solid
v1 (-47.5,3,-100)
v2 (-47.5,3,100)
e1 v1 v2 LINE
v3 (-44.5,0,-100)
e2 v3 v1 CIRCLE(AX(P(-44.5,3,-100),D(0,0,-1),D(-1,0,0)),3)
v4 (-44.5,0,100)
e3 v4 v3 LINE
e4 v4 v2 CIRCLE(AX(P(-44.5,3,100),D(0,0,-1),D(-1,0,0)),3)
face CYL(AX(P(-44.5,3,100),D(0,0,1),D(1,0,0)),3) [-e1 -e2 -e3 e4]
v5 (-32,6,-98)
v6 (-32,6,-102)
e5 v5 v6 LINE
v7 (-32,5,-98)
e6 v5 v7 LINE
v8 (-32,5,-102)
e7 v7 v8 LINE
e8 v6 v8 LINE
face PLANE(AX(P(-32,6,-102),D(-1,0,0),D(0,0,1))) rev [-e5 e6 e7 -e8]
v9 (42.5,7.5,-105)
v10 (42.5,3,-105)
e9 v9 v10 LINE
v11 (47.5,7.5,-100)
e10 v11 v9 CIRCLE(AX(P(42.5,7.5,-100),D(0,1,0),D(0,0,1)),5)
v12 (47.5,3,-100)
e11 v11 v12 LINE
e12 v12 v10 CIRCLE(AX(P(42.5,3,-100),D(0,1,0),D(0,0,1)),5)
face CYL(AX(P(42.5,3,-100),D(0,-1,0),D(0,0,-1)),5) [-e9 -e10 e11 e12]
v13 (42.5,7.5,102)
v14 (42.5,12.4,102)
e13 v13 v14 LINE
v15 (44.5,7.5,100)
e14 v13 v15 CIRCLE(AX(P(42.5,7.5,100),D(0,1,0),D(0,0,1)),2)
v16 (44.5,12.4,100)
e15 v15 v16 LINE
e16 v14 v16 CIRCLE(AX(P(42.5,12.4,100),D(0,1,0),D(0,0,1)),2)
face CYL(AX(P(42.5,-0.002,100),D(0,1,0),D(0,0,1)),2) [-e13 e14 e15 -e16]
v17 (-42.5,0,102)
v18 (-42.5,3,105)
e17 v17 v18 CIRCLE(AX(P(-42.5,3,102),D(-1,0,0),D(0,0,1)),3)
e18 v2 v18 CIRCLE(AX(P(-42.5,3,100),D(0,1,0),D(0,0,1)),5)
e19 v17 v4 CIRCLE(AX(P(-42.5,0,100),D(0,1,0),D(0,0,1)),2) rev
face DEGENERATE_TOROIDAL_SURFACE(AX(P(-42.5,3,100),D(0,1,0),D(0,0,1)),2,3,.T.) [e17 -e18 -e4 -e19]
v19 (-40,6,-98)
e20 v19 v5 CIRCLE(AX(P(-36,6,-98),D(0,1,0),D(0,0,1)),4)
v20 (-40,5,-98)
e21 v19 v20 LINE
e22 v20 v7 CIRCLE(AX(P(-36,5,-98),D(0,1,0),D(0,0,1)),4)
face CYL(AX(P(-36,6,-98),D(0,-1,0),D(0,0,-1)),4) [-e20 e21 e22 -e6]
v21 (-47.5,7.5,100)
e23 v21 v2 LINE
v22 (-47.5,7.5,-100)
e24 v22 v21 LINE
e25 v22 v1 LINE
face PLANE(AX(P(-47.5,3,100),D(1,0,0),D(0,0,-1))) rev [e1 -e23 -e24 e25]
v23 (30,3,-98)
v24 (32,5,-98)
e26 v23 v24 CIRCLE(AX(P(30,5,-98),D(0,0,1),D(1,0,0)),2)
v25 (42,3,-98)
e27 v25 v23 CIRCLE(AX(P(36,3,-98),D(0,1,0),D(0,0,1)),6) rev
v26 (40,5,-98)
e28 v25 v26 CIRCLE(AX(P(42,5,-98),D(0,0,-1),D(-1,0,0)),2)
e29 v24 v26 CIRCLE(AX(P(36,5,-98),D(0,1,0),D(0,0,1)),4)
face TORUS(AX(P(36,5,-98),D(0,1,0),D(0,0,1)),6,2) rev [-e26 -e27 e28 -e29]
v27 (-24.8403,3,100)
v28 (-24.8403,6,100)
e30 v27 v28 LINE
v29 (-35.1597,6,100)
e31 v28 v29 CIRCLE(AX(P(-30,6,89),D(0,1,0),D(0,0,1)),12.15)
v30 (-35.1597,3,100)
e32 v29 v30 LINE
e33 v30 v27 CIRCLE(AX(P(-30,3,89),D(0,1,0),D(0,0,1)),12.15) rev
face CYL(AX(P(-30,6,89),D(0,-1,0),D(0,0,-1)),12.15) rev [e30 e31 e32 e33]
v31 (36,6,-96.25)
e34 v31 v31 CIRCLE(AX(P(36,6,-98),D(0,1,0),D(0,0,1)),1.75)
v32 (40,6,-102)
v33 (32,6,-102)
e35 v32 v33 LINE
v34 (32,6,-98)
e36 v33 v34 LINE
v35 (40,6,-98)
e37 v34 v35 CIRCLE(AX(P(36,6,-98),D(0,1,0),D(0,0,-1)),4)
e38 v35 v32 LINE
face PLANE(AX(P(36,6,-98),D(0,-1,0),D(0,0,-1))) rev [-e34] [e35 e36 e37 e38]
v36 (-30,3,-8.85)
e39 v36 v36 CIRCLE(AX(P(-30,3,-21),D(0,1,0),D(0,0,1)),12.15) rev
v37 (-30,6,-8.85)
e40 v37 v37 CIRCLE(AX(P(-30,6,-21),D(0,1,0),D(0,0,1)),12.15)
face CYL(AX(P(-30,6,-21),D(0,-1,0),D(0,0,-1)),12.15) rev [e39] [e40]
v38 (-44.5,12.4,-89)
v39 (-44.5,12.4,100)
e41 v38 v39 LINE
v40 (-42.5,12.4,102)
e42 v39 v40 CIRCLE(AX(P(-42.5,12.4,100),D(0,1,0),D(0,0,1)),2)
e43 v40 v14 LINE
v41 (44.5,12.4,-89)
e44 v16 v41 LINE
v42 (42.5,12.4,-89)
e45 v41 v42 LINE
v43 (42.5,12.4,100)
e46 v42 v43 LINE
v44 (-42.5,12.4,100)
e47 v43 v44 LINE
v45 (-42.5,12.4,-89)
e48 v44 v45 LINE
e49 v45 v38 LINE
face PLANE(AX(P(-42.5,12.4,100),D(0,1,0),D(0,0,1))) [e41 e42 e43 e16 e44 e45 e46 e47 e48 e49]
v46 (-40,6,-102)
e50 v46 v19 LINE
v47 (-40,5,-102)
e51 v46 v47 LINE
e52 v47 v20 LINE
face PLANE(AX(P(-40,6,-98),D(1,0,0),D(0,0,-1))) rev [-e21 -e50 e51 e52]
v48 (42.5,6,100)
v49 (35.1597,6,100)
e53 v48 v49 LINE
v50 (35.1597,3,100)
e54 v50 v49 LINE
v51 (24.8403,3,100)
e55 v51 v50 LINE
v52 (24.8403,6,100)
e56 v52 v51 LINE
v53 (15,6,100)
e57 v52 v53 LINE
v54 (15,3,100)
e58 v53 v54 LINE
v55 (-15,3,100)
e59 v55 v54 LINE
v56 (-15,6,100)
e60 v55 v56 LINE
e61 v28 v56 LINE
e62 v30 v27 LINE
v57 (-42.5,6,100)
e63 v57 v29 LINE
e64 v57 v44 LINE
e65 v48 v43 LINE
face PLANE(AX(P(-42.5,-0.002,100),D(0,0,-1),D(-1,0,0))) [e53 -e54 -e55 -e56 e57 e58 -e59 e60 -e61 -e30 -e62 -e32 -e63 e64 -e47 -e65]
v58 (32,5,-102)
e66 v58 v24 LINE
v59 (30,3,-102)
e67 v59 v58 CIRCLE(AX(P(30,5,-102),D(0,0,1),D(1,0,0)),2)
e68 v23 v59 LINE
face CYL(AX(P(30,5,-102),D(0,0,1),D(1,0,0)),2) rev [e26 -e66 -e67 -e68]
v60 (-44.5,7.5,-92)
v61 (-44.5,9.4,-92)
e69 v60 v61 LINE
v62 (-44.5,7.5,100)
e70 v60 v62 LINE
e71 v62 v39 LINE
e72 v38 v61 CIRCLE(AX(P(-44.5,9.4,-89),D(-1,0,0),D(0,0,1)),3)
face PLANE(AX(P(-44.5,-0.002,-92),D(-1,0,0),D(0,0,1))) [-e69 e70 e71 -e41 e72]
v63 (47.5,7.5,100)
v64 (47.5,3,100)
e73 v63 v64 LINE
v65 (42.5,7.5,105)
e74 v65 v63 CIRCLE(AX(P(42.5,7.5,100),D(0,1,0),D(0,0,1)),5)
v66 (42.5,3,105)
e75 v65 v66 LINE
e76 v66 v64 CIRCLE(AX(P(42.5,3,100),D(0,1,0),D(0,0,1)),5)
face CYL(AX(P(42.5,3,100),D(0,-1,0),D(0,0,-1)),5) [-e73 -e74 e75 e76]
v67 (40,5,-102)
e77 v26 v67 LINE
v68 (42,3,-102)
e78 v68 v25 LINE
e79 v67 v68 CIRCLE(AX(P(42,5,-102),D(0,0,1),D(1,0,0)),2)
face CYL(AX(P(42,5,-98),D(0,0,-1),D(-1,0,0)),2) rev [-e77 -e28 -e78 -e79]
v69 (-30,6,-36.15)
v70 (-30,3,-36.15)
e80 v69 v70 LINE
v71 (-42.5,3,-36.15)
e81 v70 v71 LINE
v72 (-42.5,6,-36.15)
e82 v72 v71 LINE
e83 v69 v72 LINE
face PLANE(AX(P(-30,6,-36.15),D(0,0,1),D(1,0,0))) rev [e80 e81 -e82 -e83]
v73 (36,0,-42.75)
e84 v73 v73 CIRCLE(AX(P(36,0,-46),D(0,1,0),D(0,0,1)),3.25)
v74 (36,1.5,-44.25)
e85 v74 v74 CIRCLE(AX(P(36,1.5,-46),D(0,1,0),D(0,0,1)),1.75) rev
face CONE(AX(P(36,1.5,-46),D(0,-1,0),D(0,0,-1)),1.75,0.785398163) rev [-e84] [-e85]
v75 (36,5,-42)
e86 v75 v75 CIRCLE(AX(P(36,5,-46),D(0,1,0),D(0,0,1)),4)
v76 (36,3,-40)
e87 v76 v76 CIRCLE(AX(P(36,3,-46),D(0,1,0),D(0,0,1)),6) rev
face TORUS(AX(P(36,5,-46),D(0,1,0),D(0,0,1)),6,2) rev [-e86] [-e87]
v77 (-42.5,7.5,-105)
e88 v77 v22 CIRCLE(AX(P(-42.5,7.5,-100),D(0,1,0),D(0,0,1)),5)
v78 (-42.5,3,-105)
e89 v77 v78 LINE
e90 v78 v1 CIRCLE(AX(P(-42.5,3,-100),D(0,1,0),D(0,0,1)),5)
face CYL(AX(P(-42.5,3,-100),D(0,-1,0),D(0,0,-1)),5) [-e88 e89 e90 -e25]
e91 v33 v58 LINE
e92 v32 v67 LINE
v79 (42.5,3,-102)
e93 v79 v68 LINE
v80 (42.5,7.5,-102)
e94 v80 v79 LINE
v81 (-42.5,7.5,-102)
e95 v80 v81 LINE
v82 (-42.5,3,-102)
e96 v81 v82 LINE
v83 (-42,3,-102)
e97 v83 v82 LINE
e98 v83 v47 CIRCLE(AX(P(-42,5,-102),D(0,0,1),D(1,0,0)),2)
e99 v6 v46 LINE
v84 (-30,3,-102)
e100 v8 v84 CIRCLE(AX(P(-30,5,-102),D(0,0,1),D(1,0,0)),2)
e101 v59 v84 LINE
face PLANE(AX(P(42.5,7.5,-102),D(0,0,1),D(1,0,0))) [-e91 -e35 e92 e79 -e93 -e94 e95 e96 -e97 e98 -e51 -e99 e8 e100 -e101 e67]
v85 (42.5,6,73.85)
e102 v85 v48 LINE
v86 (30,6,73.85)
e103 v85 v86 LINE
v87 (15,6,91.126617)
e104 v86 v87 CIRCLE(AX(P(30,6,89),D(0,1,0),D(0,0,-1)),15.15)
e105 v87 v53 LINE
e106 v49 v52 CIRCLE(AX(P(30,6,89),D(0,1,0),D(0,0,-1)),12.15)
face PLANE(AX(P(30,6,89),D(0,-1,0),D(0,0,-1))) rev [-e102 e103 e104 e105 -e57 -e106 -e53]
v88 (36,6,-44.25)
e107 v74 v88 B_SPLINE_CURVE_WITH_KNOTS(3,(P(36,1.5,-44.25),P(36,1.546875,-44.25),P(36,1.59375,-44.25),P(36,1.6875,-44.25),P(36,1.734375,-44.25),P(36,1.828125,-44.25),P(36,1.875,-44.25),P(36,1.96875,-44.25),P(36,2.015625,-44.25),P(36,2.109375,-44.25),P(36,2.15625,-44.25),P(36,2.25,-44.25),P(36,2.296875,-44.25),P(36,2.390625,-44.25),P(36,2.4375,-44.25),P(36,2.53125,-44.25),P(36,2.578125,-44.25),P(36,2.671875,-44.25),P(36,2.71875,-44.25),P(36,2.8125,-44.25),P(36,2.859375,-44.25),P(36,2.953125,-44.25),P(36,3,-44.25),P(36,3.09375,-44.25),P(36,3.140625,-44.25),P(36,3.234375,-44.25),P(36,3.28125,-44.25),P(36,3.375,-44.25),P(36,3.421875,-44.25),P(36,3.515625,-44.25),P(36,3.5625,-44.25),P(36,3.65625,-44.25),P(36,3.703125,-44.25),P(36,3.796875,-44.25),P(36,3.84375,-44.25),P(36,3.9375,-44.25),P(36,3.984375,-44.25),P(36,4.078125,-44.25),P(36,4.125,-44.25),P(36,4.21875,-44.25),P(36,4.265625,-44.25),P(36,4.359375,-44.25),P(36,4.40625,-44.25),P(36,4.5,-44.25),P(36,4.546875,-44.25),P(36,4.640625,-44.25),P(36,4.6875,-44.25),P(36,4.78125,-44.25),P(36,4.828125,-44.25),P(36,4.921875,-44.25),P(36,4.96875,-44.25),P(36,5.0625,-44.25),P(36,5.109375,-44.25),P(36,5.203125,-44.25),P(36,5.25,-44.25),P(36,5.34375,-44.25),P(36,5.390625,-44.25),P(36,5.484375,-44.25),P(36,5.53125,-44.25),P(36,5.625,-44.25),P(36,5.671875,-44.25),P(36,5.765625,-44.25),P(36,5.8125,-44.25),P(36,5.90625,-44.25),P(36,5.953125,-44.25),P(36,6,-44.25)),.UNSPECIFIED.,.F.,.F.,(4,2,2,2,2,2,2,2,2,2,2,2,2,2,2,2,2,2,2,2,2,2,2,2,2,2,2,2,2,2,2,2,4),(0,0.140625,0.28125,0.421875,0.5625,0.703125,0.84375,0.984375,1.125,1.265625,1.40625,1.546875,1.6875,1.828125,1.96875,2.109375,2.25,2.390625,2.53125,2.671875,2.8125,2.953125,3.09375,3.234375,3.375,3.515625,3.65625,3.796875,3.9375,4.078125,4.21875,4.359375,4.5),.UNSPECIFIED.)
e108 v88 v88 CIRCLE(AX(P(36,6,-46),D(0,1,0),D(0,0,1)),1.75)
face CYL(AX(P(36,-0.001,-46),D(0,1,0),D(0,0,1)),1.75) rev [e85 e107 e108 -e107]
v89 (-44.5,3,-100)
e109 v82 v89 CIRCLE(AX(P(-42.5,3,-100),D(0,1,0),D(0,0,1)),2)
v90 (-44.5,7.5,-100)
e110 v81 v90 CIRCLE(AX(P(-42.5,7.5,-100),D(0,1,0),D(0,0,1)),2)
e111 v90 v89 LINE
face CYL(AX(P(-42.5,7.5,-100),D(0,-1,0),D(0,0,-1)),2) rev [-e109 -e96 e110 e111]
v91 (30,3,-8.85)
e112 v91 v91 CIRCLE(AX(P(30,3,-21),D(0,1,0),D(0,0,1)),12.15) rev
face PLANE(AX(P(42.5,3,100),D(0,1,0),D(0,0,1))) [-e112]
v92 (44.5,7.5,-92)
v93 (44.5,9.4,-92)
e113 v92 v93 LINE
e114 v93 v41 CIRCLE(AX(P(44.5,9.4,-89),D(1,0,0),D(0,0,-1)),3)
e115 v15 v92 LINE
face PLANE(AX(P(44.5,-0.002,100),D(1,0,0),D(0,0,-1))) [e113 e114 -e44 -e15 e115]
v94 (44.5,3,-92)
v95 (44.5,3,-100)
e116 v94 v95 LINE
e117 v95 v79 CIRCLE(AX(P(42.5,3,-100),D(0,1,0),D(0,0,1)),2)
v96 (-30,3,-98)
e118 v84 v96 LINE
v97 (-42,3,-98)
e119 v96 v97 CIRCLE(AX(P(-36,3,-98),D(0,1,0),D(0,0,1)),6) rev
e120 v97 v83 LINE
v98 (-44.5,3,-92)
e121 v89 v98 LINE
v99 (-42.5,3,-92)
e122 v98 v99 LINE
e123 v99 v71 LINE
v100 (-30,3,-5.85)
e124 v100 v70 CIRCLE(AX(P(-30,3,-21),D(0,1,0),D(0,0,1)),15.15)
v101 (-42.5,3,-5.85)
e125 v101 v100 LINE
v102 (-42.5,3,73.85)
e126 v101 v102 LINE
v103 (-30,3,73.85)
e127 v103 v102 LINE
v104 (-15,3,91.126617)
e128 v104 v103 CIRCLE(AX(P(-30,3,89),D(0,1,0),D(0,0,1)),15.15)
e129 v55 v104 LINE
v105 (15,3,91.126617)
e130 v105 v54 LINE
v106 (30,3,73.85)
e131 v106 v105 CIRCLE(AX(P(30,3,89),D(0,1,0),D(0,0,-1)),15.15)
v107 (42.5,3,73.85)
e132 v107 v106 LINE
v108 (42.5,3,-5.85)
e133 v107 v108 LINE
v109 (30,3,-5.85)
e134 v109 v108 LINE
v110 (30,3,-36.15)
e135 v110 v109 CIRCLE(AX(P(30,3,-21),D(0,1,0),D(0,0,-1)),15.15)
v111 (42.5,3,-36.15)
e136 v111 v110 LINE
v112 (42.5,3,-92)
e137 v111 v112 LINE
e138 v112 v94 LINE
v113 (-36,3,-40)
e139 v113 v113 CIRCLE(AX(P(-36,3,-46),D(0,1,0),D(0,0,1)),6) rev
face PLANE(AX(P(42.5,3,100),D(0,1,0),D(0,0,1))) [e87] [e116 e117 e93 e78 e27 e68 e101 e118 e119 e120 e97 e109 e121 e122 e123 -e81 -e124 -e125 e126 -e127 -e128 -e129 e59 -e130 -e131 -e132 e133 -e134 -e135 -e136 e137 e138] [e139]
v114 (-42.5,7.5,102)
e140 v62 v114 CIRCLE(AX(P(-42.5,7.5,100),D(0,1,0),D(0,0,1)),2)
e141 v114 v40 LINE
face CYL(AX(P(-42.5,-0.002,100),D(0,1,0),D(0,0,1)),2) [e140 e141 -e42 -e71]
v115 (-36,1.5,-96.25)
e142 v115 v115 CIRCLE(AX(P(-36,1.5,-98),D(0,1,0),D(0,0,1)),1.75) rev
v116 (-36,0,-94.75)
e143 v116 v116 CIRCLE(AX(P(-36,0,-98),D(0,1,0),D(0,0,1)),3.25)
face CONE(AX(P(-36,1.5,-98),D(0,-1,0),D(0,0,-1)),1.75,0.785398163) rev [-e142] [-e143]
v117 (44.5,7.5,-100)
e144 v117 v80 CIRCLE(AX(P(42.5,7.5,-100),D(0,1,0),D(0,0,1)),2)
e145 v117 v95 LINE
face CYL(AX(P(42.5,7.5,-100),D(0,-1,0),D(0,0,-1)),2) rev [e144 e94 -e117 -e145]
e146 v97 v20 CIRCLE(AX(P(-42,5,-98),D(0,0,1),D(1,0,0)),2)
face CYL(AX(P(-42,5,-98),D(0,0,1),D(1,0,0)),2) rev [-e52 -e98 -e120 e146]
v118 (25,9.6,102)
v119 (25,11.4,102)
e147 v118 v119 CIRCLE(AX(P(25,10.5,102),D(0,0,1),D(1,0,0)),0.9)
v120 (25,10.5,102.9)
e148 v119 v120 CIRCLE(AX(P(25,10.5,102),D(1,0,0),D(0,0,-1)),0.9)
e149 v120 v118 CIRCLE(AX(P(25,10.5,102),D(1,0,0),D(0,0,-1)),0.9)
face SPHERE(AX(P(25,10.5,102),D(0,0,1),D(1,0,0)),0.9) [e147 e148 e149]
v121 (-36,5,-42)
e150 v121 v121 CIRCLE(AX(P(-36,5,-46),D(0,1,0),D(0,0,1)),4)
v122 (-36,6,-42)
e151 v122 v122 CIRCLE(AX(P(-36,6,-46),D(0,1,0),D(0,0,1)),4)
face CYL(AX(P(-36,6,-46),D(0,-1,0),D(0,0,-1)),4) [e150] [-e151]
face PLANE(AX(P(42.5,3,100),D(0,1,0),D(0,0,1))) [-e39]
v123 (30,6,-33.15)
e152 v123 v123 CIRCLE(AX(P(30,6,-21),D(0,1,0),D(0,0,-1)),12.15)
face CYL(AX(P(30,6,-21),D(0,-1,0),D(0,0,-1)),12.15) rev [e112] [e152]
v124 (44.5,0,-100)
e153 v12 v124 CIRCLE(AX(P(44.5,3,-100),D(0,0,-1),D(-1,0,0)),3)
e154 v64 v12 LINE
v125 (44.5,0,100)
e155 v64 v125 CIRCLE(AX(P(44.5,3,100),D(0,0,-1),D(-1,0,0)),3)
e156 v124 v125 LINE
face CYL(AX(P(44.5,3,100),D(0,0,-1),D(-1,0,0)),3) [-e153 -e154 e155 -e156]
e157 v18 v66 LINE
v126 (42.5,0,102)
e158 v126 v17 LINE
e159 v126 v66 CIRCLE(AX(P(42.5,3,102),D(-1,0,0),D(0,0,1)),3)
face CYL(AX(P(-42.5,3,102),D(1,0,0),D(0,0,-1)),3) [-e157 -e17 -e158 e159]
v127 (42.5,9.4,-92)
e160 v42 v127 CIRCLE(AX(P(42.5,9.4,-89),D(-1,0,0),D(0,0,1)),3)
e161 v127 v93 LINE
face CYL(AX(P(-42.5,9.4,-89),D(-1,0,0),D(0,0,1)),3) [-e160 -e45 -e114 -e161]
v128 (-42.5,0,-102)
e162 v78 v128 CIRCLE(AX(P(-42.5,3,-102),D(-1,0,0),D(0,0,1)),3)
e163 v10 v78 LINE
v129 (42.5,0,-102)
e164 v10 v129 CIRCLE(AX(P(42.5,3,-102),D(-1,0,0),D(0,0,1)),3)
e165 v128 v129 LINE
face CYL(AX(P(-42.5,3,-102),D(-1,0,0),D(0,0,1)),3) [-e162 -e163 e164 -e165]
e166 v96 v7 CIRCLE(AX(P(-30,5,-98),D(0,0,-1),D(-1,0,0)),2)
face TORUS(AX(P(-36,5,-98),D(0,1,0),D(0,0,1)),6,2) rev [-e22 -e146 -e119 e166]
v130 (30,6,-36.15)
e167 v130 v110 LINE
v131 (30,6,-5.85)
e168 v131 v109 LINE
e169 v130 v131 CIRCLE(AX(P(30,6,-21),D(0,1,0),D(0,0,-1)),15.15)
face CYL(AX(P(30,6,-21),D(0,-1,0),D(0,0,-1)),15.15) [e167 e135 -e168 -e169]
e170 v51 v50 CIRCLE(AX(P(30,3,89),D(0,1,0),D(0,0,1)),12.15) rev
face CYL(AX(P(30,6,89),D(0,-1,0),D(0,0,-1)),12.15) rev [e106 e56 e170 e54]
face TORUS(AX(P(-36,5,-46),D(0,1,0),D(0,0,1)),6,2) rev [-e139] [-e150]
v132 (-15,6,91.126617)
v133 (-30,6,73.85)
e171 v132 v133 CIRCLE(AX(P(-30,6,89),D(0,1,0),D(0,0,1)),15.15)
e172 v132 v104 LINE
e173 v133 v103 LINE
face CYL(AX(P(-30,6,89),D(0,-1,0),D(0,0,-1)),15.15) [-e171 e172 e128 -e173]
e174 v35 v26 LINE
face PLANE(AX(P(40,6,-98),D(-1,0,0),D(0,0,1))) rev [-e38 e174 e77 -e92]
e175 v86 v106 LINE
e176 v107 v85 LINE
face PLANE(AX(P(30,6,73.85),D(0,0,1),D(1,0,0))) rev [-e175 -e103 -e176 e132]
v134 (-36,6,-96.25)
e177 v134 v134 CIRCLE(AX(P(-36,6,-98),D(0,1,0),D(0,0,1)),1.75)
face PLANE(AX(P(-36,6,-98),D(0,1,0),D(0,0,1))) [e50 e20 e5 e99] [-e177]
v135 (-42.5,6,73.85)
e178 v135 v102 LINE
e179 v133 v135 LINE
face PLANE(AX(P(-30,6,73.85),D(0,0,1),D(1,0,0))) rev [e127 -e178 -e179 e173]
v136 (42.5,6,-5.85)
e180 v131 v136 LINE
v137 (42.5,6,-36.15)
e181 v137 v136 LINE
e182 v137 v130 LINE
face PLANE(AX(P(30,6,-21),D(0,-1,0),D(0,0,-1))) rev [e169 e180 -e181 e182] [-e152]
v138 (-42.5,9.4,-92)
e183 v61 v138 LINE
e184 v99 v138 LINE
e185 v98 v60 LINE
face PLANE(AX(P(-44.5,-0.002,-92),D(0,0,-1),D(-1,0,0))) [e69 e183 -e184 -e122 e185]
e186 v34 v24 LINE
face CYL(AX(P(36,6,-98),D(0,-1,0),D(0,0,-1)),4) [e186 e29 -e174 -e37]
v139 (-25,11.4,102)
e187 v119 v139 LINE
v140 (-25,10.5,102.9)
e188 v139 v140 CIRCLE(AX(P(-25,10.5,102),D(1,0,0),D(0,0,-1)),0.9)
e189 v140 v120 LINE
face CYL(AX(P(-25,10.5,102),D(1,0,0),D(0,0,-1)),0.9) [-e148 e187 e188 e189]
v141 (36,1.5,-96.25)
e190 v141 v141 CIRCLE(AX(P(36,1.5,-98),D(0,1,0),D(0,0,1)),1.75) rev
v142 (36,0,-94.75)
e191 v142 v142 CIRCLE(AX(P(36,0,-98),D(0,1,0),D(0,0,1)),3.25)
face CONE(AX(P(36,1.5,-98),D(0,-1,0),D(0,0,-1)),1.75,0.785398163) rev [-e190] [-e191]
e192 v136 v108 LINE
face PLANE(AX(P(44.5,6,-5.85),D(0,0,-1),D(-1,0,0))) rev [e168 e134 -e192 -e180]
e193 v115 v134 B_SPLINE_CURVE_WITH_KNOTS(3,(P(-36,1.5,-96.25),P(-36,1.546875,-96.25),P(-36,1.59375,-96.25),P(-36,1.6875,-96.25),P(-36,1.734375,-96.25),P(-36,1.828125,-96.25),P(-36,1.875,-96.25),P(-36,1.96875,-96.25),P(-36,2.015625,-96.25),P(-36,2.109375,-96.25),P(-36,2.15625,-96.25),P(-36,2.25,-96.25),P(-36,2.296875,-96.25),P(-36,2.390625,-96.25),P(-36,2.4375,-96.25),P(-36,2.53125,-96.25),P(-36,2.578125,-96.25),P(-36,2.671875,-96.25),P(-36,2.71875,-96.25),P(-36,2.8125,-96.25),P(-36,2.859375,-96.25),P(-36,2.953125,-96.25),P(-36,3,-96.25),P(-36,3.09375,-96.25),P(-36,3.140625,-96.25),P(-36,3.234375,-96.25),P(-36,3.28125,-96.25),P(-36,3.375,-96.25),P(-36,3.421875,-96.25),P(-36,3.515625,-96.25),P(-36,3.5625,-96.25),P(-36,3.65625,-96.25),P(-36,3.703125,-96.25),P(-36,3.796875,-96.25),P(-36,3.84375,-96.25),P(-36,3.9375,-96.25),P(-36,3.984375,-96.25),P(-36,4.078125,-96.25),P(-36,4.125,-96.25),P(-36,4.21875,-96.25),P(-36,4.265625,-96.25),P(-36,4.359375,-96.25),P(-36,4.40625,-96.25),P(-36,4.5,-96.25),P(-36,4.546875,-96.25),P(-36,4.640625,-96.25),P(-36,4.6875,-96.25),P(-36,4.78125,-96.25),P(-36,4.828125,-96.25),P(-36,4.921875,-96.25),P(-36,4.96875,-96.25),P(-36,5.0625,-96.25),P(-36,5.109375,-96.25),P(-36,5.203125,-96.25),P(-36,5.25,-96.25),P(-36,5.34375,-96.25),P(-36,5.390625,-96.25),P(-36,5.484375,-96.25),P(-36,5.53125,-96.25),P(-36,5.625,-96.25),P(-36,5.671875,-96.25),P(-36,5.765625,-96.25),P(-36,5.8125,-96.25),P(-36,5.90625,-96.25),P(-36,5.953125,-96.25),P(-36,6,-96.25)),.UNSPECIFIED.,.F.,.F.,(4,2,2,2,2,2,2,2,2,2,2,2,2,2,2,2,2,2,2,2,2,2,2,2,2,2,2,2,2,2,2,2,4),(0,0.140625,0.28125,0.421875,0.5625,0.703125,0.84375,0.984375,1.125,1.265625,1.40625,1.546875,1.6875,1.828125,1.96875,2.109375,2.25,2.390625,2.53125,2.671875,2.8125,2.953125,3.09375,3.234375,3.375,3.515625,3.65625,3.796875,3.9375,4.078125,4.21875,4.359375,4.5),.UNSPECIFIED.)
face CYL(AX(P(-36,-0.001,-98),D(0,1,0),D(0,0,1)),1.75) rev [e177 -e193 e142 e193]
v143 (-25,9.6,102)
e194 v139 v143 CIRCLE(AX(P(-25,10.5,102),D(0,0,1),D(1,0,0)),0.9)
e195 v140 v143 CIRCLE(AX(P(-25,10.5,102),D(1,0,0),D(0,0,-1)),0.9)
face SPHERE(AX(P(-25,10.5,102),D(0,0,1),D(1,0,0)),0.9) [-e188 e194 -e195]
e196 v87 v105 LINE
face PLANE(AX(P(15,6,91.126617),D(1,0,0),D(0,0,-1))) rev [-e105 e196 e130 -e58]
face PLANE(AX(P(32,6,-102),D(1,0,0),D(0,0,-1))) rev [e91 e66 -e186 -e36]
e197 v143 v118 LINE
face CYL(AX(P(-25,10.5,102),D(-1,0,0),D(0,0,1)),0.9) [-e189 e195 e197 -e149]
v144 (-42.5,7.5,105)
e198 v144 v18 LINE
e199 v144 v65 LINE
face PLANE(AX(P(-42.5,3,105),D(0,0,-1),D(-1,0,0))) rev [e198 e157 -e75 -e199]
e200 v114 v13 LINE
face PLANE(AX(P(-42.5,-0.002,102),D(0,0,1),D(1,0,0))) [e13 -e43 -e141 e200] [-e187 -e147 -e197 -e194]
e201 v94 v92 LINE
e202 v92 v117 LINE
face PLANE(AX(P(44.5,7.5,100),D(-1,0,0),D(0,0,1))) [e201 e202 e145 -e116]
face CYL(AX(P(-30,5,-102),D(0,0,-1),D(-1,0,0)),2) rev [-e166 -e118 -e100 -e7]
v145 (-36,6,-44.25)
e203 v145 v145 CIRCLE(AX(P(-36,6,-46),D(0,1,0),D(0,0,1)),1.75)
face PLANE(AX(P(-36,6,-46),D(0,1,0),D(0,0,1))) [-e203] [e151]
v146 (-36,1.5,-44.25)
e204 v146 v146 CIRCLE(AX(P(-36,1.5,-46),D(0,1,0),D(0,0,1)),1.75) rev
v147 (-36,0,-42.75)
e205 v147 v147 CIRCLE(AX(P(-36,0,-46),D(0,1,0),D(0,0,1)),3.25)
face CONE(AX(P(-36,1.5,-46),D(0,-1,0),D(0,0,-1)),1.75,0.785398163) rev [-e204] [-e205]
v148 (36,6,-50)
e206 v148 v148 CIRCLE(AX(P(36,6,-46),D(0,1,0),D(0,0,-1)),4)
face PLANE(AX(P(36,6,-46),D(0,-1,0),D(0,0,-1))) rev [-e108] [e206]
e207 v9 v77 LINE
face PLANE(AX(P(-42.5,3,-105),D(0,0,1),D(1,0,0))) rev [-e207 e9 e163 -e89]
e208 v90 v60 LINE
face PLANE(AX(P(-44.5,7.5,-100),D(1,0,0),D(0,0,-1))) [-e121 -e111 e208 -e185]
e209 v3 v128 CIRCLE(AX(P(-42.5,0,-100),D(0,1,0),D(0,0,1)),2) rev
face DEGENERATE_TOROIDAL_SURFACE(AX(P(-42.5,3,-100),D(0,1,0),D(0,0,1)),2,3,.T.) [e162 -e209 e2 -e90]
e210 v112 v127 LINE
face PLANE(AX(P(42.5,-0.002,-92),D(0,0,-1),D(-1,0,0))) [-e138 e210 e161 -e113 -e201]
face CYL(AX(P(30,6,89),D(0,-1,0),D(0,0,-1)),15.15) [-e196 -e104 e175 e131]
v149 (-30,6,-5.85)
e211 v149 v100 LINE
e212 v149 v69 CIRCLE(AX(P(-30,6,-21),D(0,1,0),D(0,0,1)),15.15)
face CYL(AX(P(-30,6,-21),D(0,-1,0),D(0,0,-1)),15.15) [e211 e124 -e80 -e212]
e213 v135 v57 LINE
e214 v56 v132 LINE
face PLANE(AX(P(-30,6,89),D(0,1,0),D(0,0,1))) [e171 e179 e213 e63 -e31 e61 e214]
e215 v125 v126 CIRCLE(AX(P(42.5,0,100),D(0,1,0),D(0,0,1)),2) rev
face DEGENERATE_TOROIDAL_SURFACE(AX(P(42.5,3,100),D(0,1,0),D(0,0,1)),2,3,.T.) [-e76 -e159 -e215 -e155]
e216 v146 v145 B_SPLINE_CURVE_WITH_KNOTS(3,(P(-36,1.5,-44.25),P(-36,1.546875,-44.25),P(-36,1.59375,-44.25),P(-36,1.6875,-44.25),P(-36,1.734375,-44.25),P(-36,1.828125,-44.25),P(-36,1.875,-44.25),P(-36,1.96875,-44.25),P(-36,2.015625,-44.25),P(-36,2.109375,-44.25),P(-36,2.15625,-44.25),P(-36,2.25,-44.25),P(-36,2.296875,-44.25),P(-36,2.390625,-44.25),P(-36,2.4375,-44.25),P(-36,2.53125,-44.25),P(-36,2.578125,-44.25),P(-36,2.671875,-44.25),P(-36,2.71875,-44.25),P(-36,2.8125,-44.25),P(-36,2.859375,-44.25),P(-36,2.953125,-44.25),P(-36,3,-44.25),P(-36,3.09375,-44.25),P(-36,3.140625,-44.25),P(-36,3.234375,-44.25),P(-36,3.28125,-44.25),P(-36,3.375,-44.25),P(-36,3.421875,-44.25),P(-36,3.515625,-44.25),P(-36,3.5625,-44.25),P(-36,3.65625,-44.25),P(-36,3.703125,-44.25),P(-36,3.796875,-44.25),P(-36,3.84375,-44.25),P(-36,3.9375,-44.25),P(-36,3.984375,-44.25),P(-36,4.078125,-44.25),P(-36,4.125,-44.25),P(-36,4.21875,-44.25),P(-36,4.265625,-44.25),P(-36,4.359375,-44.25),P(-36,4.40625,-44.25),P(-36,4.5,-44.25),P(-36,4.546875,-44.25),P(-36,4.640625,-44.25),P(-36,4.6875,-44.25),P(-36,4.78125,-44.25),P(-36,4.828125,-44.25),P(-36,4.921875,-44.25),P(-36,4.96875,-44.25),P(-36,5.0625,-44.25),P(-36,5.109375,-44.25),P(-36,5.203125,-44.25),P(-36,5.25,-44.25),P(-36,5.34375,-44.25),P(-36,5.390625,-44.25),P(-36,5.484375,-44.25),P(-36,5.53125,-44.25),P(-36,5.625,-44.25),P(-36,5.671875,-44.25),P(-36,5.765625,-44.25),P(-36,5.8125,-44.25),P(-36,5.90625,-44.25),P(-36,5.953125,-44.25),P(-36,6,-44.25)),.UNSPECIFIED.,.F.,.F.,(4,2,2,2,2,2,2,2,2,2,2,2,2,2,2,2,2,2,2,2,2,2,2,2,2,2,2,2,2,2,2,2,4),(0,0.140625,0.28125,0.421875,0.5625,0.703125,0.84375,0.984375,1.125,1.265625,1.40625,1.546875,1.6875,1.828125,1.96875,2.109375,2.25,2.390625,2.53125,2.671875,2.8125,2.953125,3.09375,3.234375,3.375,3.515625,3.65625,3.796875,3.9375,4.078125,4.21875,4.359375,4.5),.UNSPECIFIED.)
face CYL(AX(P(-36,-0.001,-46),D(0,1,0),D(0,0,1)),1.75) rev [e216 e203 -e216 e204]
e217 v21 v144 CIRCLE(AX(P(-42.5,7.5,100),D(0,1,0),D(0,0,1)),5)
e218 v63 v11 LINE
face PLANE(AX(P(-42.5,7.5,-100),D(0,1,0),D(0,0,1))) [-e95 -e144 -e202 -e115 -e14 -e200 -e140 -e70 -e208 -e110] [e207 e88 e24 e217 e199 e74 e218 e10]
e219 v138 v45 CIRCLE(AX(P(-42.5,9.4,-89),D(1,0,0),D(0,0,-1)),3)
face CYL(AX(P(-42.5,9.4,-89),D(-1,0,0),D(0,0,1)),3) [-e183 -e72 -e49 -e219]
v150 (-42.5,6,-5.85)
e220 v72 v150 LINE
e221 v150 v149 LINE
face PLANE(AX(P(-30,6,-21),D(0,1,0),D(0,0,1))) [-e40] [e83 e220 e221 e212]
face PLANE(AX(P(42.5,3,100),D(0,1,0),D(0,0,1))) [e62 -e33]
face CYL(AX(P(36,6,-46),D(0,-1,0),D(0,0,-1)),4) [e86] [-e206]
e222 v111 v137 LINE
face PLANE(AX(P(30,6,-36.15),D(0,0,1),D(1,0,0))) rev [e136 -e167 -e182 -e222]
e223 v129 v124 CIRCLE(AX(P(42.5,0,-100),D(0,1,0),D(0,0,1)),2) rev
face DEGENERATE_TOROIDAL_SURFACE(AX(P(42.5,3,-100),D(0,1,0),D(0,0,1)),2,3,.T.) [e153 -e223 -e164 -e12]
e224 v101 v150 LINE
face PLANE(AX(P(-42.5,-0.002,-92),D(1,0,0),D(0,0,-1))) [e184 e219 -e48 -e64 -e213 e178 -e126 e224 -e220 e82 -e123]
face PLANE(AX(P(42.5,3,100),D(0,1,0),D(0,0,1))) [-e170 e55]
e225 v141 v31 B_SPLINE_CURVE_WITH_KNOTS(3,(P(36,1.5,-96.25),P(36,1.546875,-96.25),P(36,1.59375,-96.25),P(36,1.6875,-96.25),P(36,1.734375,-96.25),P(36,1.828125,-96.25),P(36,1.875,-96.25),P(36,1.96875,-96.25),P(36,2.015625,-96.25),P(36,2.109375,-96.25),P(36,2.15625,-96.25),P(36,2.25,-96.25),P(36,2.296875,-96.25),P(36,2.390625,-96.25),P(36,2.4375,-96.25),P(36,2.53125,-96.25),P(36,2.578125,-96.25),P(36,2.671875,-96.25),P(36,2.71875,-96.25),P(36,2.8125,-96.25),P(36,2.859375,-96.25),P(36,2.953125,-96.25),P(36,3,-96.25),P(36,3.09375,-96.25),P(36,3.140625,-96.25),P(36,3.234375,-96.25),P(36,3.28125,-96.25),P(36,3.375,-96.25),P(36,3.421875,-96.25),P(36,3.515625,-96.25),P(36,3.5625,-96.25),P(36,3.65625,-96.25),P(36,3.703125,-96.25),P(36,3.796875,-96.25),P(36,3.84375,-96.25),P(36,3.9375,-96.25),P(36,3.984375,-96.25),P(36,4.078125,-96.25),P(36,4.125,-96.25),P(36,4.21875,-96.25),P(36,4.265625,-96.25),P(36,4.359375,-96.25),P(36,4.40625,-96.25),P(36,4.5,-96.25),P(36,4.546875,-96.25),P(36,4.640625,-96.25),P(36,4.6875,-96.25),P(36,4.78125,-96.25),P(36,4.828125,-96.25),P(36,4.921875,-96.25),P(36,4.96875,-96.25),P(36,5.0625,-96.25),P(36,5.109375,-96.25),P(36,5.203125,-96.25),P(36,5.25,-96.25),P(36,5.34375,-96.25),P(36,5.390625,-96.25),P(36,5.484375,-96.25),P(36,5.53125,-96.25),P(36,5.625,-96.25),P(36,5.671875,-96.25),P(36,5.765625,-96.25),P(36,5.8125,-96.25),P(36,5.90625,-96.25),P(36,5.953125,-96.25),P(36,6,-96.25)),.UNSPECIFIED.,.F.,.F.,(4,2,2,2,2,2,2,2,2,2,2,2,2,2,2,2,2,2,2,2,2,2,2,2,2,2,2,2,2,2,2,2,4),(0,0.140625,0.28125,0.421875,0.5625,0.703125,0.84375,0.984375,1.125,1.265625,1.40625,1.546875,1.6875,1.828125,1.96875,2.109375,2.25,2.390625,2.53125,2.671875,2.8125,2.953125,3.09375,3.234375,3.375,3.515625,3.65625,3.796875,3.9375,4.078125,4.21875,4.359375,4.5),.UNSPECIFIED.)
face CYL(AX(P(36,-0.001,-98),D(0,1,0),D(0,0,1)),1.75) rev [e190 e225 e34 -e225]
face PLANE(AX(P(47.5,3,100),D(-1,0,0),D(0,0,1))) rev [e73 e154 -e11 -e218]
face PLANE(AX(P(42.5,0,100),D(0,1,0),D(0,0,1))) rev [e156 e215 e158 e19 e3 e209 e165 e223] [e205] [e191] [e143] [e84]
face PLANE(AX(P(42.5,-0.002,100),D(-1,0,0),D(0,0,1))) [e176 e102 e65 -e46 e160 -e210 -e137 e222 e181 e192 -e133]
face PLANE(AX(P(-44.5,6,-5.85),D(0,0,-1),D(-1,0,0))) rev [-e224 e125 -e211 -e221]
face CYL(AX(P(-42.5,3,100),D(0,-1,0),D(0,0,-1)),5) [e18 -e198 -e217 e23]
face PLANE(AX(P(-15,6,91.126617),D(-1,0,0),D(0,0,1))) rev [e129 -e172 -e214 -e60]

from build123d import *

# Parameters (mm, degrees)
BOSS_EXTRUDE1_DEPTH             = 3
BOSS_EXTRUDE2_DEPTH             = 4.5
SKETCH3_R                       = 4
SKETCH3_R_2                     = 1.4
SKETCH3_R_3                     = 12.15
BOSS_EXTRUDE3_DEPTH             = 3
CUT_EXTRUDE3_REACH              = 117.4
SKETCH6_R                       = 1.75
BOSS_EXTRUDE5_DEPTH             = 4.9
BOSS_EXTRUDE5_DIRECTION_2_REACH = 117.488
FILLET3_R                       = 3
BOSS_EXTRUDE6_DEPTH             = 0.9
FILLET4_R                       = 0.9
CHAMFER4_SIZE                   = 1.5
FILLET6_R                       = 2
FILLET7_R                       = 3


with BuildPart() as part:
    # Sketch1 → Boss-Extrude1 (new body)
    with BuildSketch(Plane(origin=(0, 0, 0), x_dir=(1, 0, 0), z_dir=(0, 1, 0))):
        with BuildLine():
            Line((-42.5, -105), (42.5, -105))
            ThreePointArc((42.5, -105), (46.035533906, -103.535533906), (47.5, -100))
            Line((47.5, -100), (47.5, 100))
            ThreePointArc((47.5, 100), (46.035533906, 103.535533906), (42.5, 105))
            Line((42.5, 105), (-42.5, 105))
            ThreePointArc((-42.5, 105), (-46.035533906, 103.535533906), (-47.5, 100))
            Line((-47.5, 100), (-47.5, -100))
            ThreePointArc((-47.5, -100), (-46.035533906, -103.535533906), (-42.5, -105))
        make_face()
    extrude(amount=BOSS_EXTRUDE1_DEPTH)

    # Sketch2 → Boss-Extrude2 (add)
    with BuildSketch(Plane(origin=(0, 3, 0), x_dir=(1, 0, 0), z_dir=(0, 1, 0))):
        with BuildLine():
            Line((42.5, 105), (-42.5, 105))
            ThreePointArc((-42.5, 105), (-46.035533906, 103.535533906), (-47.5, 100))
            Line((-47.5, 100), (-47.5, -100))
            ThreePointArc((-47.5, -100), (-46.035533906, -103.535533906), (-42.5, -105))
            Line((-42.5, -105), (42.5, -105))
            ThreePointArc((42.5, -105), (46.035533906, -103.535533906), (47.5, -100))
            Line((47.5, -100), (47.5, 100))
            ThreePointArc((47.5, 100), (46.035533906, 103.535533906), (42.5, 105))
        make_face()
        with BuildLine():
            Line((42.5, 102), (-42.5, 102))
            ThreePointArc((-42.5, 102), (-43.914213562, 101.414213562), (-44.5, 100))
            Line((-44.5, 100), (-44.5, -100))
            ThreePointArc((-44.5, -100), (-43.914213562, -101.414213562), (-42.5, -102))
            Line((-42.5, -102), (42.5, -102))
            ThreePointArc((42.5, -102), (43.914213562, -101.414213562), (44.5, -100))
            Line((44.5, -100), (44.5, 100))
            ThreePointArc((44.5, 100), (43.914213562, 101.414213562), (42.5, 102))
        make_face(mode=Mode.SUBTRACT)
    extrude(amount=BOSS_EXTRUDE2_DEPTH)

    # Sketch3 → Boss-Extrude3 (add)
    # profile 1 of 8: a face of its own
    with BuildSketch(Plane(origin=(0, 3, 0), x_dir=(1, 0, 0), z_dir=(0, 1, 0))):
        with Locations(Location((-36, 46, 0), (0, 0, 270))):
            Circle(SKETCH3_R)
        with Locations(Location((-36, 46, 0), (0, 0, 270))):
            Circle(SKETCH3_R_2, mode=Mode.SUBTRACT)
    # profile 2 of 8: a face of its own
    with BuildSketch(Plane(origin=(0, 3, 0), x_dir=(1, 0, 0), z_dir=(0, 1, 0))):
        with Locations(Location((36, 46, 0), (0, 0, 90))):
            Circle(SKETCH3_R)
        with Locations(Location((36, 46, 0), (0, 0, 90))):
            Circle(SKETCH3_R_2, mode=Mode.SUBTRACT)
    # profile 3 of 8: a face of its own
    with BuildSketch(Plane(origin=(0, 3, 0), x_dir=(1, 0, 0), z_dir=(0, 1, 0))):
        with BuildLine():
            Line((-15, -91.126617032), (-15, -102))
            Line((-15, -102), (-44.5, -102))
            Line((-44.5, -102), (-44.5, -73.85))
            Line((-44.5, -73.85), (-30, -73.85))
            ThreePointArc((-30, -73.85), (-18.560140997, -79.06762234), (-15, -91.126617032))
        make_face()
        with Locations(Location((-30, -89, 0), (0, 0, 270))):
            Circle(SKETCH3_R_3, mode=Mode.SUBTRACT)
    # profile 4 of 8: a face of its own
    with BuildSketch(Plane(origin=(0, 3, 0), x_dir=(1, 0, 0), z_dir=(0, 1, 0))):
        with BuildLine():
            Line((-40, 98), (-40, 102))
            Line((-40, 102), (-32, 102))
            Line((-32, 102), (-32, 98))
            ThreePointArc((-32, 98), (-36, 94), (-40, 98))
        make_face()
        with Locations(Location((-36, 98, 0), (0, 0, 270))):
            Circle(SKETCH3_R_2, mode=Mode.SUBTRACT)
    # profile 5 of 8: a face of its own
    with BuildSketch(Plane(origin=(0, 3, 0), x_dir=(1, 0, 0), z_dir=(0, 1, 0))):
        with BuildLine():
            Line((32, 102), (32, 98))
            ThreePointArc((32, 98), (36, 94), (40, 98))
            Line((40, 98), (40, 102))
            Line((40, 102), (32, 102))
        make_face()
        with Locations(Location((36, 98, 0), (0, 0, 90))):
            Circle(SKETCH3_R_2, mode=Mode.SUBTRACT)
    # profile 6 of 8: a face of its own
    with BuildSketch(Plane(origin=(0, 3, 0), x_dir=(1, 0, 0), z_dir=(0, 1, 0))):
        with BuildLine():
            Line((-30, 36.15), (-44.5, 36.15))
            Line((-44.5, 36.15), (-44.5, 5.85))
            Line((-44.5, 5.85), (-30, 5.85))
            ThreePointArc((-30, 5.85), (-14.85, 21), (-30, 36.15))
        make_face()
        with Locations(Location((-30, 21, 0), (0, 0, 270))):
            Circle(SKETCH3_R_3, mode=Mode.SUBTRACT)
    # profile 7 of 8: a face of its own
    with BuildSketch(Plane(origin=(0, 3, 0), x_dir=(1, 0, 0), z_dir=(0, 1, 0))):
        with BuildLine():
            Line((44.5, 5.85), (30, 5.85))
            ThreePointArc((30, 5.85), (14.85, 21), (30, 36.15))
            Line((30, 36.15), (44.5, 36.15))
            Line((44.5, 36.15), (44.5, 5.85))
        make_face()
        with Locations(Location((30, 21, 0), (0, 0, 90))):
            Circle(SKETCH3_R_3, mode=Mode.SUBTRACT)
    # profile 8 of 8: a face of its own
    with BuildSketch(Plane(origin=(0, 3, 0), x_dir=(1, 0, 0), z_dir=(0, 1, 0))):
        with BuildLine():
            Line((15, -102), (44.5, -102))
            Line((44.5, -102), (44.5, -73.85))
            Line((44.5, -73.85), (30, -73.85))
            ThreePointArc((30, -73.85), (18.560140997, -79.06762234), (15, -91.126617032))
            Line((15, -91.126617032), (15, -102))
        make_face()
        with Locations(Location((30, -89, 0), (0, 0, 90))):
            Circle(SKETCH3_R_3, mode=Mode.SUBTRACT)
    extrude(amount=BOSS_EXTRUDE3_DEPTH)

    # Sketch6 → Cut-Extrude3 (cut, up to next)
    with BuildSketch(Plane(origin=(0, 6, 0), x_dir=(1, 0, 0), z_dir=(0, 1, 0)), mode=Mode.PRIVATE) as cut_extrude3_sk1:
        with Locations(Location((-36, 98, 0), (0, 0, 270))):
            Circle(SKETCH6_R)
    cut_extrude3_tool1 = extrude(cut_extrude3_sk1.sketch, amount=-CUT_EXTRUDE3_REACH, mode=Mode.PRIVATE) & part.part
    # Sketch6 → Cut-Extrude3 (cut, up to next)
    with BuildSketch(Plane(origin=(0, 6, 0), x_dir=(1, 0, 0), z_dir=(0, 1, 0)), mode=Mode.PRIVATE) as cut_extrude3_sk2:
        with Locations(Location((36, 98, 0), (0, 0, 270))):
            Circle(SKETCH6_R)
    cut_extrude3_tool2 = extrude(cut_extrude3_sk2.sketch, amount=-CUT_EXTRUDE3_REACH, mode=Mode.PRIVATE) & part.part
    # Sketch6 → Cut-Extrude3 (cut, up to next)
    with BuildSketch(Plane(origin=(0, 6, 0), x_dir=(1, 0, 0), z_dir=(0, 1, 0)), mode=Mode.PRIVATE) as cut_extrude3_sk3:
        with Locations(Location((-36, 46, 0), (0, 0, 270))):
            Circle(SKETCH6_R)
    cut_extrude3_tool3 = extrude(cut_extrude3_sk3.sketch, amount=-CUT_EXTRUDE3_REACH, mode=Mode.PRIVATE) & part.part
    # Sketch6 → Cut-Extrude3 (cut, up to next)
    with BuildSketch(Plane(origin=(0, 6, 0), x_dir=(1, 0, 0), z_dir=(0, 1, 0)), mode=Mode.PRIVATE) as cut_extrude3_sk4:
        with Locations(Location((36, 46, 0), (0, 0, 270))):
            Circle(SKETCH6_R)
    cut_extrude3_tool4 = extrude(cut_extrude3_sk4.sketch, amount=-CUT_EXTRUDE3_REACH, mode=Mode.PRIVATE) & part.part
    add(cut_extrude3_tool1.solids().sort_by_distance((-36, 6, -98))[0], mode=Mode.SUBTRACT)
    add(cut_extrude3_tool2.solids().sort_by_distance((36, 6, -98))[0], mode=Mode.SUBTRACT)
    add(cut_extrude3_tool3.solids().sort_by_distance((-36, 6, -46))[0], mode=Mode.SUBTRACT)
    add(cut_extrude3_tool4.solids().sort_by_distance((36, 6, -46))[0], mode=Mode.SUBTRACT)

    # Sketch5 → Boss-Extrude5 (add)
    with BuildSketch(Plane(origin=(0, 7.5, 0), x_dir=(1, 0, 0), z_dir=(0, 1, 0))):
        with BuildLine():
            Line((-42.5, -102), (42.5, -102))
            ThreePointArc((42.5, -102), (43.914213562, -101.414213562), (44.5, -100))
            Line((44.5, -100), (44.5, 92))
            Line((44.5, 92), (42.5, 92))
            Line((42.5, 92), (42.5, -100))
            Line((42.5, -100), (-42.5, -100))
            Line((-42.5, -100), (-42.5, 92))
            Line((-42.5, 92), (-44.5, 92))
            Line((-44.5, 92), (-44.5, -100))
            ThreePointArc((-44.5, -100), (-43.914213562, -101.414213562), (-42.5, -102))
        make_face()
    extrude(amount=BOSS_EXTRUDE5_DEPTH)

    # Sketch5 → Boss-Extrude5 direction 2 (add, up to next)
    with BuildSketch(Plane(origin=(0, 7.5, 0), x_dir=(1, 0, 0), z_dir=(0, 1, 0)), mode=Mode.PRIVATE) as boss_extrude5_direction_2_sk1:
        with BuildLine():
            Line((-42.5, -102), (42.5, -102))
            ThreePointArc((42.5, -102), (43.914213562, -101.414213562), (44.5, -100))
            Line((44.5, -100), (44.5, 92))
            Line((44.5, 92), (42.5, 92))
            Line((42.5, 92), (42.5, -100))
            Line((42.5, -100), (-42.5, -100))
            Line((-42.5, -100), (-42.5, 92))
            Line((-42.5, 92), (-44.5, 92))
            Line((-44.5, 92), (-44.5, -100))
            ThreePointArc((-44.5, -100), (-43.914213562, -101.414213562), (-42.5, -102))
        make_face()
    boss_extrude5_direction_2_tool1 = extrude(boss_extrude5_direction_2_sk1.sketch, amount=-BOSS_EXTRUDE5_DIRECTION_2_REACH, mode=Mode.PRIVATE) - part.part
    add(boss_extrude5_direction_2_tool1.solids().sort_by_distance((-43.763288, 7.5, 101.263288))[0])

    # Fillet3
    fillet3_edges = [part.edges().sort_by_distance(p)[0] for p in [
        (43.5, 12.4, -92),
        (-43.5, 12.4, -92),
    ]]
    fillet(fillet3_edges, radius=FILLET3_R)

    # Sketch8 → Boss-Extrude6 (add)
    with BuildSketch(Plane.XY.offset(102)):
        with BuildLine():
            Line((-25, 11.4), (25, 11.4))
            ThreePointArc((25, 11.4), (25.9, 10.5), (25, 9.6))
            Line((25, 9.6), (-25, 9.6))
            ThreePointArc((-25, 9.6), (-25.9, 10.5), (-25, 11.4))
        make_face()
    extrude(amount=BOSS_EXTRUDE6_DEPTH)

    # Fillet4
    fillet4_edges = [part.edges().sort_by_distance(p)[0] for p in [
        (25.9, 10.5, 102.9),
        (0, 9.6, 102.9),
        (-25.9, 10.5, 102.9),
        (0, 11.4, 102.9),
    ]]
    fillet(fillet4_edges, radius=FILLET4_R - 0.0001)  # a hair under: the kernel refuses the full size

    # Chamfer4
    chamfer4_edges = [part.edges().sort_by_distance(p)[0] for p in [
        (36, 0, -99.75),
        (-36, 0, -47.75),
        (36, 0, -47.75),
        (-36, 0, -99.75),
    ]]
    chamfer(chamfer4_edges, length=CHAMFER4_SIZE)

    # Fillet6
    fillet6_edges = [part.edges().sort_by_distance(p)[0] for p in [
        (36, 3, -94),
        (40, 3, -100),
        (32, 3, -100),
        (-36, 3, -50),
        (-32, 3, -100),
        (-40, 3, -100),
        (-36, 3, -94),
        (36, 3, -42),
    ]]
    fillet(fillet6_edges, radius=FILLET6_R)

    # Fillet7
    fillet7_edges = [part.edges().sort_by_distance(p)[0] for p in [
        (0, 0, -105),
        (46.035533906, 0, -103.535533906),
        (47.5, 0, 0),
        (46.035533906, 0, 103.535533906),
        (0, 0, 105),
        (-46.035533906, 0, 103.535533906),
        (-47.5, 0, 0),
        (-46.035533906, 0, -103.535533906),
    ]]
    fillet(fillet7_edges, radius=FILLET7_R)


solid = part.part
